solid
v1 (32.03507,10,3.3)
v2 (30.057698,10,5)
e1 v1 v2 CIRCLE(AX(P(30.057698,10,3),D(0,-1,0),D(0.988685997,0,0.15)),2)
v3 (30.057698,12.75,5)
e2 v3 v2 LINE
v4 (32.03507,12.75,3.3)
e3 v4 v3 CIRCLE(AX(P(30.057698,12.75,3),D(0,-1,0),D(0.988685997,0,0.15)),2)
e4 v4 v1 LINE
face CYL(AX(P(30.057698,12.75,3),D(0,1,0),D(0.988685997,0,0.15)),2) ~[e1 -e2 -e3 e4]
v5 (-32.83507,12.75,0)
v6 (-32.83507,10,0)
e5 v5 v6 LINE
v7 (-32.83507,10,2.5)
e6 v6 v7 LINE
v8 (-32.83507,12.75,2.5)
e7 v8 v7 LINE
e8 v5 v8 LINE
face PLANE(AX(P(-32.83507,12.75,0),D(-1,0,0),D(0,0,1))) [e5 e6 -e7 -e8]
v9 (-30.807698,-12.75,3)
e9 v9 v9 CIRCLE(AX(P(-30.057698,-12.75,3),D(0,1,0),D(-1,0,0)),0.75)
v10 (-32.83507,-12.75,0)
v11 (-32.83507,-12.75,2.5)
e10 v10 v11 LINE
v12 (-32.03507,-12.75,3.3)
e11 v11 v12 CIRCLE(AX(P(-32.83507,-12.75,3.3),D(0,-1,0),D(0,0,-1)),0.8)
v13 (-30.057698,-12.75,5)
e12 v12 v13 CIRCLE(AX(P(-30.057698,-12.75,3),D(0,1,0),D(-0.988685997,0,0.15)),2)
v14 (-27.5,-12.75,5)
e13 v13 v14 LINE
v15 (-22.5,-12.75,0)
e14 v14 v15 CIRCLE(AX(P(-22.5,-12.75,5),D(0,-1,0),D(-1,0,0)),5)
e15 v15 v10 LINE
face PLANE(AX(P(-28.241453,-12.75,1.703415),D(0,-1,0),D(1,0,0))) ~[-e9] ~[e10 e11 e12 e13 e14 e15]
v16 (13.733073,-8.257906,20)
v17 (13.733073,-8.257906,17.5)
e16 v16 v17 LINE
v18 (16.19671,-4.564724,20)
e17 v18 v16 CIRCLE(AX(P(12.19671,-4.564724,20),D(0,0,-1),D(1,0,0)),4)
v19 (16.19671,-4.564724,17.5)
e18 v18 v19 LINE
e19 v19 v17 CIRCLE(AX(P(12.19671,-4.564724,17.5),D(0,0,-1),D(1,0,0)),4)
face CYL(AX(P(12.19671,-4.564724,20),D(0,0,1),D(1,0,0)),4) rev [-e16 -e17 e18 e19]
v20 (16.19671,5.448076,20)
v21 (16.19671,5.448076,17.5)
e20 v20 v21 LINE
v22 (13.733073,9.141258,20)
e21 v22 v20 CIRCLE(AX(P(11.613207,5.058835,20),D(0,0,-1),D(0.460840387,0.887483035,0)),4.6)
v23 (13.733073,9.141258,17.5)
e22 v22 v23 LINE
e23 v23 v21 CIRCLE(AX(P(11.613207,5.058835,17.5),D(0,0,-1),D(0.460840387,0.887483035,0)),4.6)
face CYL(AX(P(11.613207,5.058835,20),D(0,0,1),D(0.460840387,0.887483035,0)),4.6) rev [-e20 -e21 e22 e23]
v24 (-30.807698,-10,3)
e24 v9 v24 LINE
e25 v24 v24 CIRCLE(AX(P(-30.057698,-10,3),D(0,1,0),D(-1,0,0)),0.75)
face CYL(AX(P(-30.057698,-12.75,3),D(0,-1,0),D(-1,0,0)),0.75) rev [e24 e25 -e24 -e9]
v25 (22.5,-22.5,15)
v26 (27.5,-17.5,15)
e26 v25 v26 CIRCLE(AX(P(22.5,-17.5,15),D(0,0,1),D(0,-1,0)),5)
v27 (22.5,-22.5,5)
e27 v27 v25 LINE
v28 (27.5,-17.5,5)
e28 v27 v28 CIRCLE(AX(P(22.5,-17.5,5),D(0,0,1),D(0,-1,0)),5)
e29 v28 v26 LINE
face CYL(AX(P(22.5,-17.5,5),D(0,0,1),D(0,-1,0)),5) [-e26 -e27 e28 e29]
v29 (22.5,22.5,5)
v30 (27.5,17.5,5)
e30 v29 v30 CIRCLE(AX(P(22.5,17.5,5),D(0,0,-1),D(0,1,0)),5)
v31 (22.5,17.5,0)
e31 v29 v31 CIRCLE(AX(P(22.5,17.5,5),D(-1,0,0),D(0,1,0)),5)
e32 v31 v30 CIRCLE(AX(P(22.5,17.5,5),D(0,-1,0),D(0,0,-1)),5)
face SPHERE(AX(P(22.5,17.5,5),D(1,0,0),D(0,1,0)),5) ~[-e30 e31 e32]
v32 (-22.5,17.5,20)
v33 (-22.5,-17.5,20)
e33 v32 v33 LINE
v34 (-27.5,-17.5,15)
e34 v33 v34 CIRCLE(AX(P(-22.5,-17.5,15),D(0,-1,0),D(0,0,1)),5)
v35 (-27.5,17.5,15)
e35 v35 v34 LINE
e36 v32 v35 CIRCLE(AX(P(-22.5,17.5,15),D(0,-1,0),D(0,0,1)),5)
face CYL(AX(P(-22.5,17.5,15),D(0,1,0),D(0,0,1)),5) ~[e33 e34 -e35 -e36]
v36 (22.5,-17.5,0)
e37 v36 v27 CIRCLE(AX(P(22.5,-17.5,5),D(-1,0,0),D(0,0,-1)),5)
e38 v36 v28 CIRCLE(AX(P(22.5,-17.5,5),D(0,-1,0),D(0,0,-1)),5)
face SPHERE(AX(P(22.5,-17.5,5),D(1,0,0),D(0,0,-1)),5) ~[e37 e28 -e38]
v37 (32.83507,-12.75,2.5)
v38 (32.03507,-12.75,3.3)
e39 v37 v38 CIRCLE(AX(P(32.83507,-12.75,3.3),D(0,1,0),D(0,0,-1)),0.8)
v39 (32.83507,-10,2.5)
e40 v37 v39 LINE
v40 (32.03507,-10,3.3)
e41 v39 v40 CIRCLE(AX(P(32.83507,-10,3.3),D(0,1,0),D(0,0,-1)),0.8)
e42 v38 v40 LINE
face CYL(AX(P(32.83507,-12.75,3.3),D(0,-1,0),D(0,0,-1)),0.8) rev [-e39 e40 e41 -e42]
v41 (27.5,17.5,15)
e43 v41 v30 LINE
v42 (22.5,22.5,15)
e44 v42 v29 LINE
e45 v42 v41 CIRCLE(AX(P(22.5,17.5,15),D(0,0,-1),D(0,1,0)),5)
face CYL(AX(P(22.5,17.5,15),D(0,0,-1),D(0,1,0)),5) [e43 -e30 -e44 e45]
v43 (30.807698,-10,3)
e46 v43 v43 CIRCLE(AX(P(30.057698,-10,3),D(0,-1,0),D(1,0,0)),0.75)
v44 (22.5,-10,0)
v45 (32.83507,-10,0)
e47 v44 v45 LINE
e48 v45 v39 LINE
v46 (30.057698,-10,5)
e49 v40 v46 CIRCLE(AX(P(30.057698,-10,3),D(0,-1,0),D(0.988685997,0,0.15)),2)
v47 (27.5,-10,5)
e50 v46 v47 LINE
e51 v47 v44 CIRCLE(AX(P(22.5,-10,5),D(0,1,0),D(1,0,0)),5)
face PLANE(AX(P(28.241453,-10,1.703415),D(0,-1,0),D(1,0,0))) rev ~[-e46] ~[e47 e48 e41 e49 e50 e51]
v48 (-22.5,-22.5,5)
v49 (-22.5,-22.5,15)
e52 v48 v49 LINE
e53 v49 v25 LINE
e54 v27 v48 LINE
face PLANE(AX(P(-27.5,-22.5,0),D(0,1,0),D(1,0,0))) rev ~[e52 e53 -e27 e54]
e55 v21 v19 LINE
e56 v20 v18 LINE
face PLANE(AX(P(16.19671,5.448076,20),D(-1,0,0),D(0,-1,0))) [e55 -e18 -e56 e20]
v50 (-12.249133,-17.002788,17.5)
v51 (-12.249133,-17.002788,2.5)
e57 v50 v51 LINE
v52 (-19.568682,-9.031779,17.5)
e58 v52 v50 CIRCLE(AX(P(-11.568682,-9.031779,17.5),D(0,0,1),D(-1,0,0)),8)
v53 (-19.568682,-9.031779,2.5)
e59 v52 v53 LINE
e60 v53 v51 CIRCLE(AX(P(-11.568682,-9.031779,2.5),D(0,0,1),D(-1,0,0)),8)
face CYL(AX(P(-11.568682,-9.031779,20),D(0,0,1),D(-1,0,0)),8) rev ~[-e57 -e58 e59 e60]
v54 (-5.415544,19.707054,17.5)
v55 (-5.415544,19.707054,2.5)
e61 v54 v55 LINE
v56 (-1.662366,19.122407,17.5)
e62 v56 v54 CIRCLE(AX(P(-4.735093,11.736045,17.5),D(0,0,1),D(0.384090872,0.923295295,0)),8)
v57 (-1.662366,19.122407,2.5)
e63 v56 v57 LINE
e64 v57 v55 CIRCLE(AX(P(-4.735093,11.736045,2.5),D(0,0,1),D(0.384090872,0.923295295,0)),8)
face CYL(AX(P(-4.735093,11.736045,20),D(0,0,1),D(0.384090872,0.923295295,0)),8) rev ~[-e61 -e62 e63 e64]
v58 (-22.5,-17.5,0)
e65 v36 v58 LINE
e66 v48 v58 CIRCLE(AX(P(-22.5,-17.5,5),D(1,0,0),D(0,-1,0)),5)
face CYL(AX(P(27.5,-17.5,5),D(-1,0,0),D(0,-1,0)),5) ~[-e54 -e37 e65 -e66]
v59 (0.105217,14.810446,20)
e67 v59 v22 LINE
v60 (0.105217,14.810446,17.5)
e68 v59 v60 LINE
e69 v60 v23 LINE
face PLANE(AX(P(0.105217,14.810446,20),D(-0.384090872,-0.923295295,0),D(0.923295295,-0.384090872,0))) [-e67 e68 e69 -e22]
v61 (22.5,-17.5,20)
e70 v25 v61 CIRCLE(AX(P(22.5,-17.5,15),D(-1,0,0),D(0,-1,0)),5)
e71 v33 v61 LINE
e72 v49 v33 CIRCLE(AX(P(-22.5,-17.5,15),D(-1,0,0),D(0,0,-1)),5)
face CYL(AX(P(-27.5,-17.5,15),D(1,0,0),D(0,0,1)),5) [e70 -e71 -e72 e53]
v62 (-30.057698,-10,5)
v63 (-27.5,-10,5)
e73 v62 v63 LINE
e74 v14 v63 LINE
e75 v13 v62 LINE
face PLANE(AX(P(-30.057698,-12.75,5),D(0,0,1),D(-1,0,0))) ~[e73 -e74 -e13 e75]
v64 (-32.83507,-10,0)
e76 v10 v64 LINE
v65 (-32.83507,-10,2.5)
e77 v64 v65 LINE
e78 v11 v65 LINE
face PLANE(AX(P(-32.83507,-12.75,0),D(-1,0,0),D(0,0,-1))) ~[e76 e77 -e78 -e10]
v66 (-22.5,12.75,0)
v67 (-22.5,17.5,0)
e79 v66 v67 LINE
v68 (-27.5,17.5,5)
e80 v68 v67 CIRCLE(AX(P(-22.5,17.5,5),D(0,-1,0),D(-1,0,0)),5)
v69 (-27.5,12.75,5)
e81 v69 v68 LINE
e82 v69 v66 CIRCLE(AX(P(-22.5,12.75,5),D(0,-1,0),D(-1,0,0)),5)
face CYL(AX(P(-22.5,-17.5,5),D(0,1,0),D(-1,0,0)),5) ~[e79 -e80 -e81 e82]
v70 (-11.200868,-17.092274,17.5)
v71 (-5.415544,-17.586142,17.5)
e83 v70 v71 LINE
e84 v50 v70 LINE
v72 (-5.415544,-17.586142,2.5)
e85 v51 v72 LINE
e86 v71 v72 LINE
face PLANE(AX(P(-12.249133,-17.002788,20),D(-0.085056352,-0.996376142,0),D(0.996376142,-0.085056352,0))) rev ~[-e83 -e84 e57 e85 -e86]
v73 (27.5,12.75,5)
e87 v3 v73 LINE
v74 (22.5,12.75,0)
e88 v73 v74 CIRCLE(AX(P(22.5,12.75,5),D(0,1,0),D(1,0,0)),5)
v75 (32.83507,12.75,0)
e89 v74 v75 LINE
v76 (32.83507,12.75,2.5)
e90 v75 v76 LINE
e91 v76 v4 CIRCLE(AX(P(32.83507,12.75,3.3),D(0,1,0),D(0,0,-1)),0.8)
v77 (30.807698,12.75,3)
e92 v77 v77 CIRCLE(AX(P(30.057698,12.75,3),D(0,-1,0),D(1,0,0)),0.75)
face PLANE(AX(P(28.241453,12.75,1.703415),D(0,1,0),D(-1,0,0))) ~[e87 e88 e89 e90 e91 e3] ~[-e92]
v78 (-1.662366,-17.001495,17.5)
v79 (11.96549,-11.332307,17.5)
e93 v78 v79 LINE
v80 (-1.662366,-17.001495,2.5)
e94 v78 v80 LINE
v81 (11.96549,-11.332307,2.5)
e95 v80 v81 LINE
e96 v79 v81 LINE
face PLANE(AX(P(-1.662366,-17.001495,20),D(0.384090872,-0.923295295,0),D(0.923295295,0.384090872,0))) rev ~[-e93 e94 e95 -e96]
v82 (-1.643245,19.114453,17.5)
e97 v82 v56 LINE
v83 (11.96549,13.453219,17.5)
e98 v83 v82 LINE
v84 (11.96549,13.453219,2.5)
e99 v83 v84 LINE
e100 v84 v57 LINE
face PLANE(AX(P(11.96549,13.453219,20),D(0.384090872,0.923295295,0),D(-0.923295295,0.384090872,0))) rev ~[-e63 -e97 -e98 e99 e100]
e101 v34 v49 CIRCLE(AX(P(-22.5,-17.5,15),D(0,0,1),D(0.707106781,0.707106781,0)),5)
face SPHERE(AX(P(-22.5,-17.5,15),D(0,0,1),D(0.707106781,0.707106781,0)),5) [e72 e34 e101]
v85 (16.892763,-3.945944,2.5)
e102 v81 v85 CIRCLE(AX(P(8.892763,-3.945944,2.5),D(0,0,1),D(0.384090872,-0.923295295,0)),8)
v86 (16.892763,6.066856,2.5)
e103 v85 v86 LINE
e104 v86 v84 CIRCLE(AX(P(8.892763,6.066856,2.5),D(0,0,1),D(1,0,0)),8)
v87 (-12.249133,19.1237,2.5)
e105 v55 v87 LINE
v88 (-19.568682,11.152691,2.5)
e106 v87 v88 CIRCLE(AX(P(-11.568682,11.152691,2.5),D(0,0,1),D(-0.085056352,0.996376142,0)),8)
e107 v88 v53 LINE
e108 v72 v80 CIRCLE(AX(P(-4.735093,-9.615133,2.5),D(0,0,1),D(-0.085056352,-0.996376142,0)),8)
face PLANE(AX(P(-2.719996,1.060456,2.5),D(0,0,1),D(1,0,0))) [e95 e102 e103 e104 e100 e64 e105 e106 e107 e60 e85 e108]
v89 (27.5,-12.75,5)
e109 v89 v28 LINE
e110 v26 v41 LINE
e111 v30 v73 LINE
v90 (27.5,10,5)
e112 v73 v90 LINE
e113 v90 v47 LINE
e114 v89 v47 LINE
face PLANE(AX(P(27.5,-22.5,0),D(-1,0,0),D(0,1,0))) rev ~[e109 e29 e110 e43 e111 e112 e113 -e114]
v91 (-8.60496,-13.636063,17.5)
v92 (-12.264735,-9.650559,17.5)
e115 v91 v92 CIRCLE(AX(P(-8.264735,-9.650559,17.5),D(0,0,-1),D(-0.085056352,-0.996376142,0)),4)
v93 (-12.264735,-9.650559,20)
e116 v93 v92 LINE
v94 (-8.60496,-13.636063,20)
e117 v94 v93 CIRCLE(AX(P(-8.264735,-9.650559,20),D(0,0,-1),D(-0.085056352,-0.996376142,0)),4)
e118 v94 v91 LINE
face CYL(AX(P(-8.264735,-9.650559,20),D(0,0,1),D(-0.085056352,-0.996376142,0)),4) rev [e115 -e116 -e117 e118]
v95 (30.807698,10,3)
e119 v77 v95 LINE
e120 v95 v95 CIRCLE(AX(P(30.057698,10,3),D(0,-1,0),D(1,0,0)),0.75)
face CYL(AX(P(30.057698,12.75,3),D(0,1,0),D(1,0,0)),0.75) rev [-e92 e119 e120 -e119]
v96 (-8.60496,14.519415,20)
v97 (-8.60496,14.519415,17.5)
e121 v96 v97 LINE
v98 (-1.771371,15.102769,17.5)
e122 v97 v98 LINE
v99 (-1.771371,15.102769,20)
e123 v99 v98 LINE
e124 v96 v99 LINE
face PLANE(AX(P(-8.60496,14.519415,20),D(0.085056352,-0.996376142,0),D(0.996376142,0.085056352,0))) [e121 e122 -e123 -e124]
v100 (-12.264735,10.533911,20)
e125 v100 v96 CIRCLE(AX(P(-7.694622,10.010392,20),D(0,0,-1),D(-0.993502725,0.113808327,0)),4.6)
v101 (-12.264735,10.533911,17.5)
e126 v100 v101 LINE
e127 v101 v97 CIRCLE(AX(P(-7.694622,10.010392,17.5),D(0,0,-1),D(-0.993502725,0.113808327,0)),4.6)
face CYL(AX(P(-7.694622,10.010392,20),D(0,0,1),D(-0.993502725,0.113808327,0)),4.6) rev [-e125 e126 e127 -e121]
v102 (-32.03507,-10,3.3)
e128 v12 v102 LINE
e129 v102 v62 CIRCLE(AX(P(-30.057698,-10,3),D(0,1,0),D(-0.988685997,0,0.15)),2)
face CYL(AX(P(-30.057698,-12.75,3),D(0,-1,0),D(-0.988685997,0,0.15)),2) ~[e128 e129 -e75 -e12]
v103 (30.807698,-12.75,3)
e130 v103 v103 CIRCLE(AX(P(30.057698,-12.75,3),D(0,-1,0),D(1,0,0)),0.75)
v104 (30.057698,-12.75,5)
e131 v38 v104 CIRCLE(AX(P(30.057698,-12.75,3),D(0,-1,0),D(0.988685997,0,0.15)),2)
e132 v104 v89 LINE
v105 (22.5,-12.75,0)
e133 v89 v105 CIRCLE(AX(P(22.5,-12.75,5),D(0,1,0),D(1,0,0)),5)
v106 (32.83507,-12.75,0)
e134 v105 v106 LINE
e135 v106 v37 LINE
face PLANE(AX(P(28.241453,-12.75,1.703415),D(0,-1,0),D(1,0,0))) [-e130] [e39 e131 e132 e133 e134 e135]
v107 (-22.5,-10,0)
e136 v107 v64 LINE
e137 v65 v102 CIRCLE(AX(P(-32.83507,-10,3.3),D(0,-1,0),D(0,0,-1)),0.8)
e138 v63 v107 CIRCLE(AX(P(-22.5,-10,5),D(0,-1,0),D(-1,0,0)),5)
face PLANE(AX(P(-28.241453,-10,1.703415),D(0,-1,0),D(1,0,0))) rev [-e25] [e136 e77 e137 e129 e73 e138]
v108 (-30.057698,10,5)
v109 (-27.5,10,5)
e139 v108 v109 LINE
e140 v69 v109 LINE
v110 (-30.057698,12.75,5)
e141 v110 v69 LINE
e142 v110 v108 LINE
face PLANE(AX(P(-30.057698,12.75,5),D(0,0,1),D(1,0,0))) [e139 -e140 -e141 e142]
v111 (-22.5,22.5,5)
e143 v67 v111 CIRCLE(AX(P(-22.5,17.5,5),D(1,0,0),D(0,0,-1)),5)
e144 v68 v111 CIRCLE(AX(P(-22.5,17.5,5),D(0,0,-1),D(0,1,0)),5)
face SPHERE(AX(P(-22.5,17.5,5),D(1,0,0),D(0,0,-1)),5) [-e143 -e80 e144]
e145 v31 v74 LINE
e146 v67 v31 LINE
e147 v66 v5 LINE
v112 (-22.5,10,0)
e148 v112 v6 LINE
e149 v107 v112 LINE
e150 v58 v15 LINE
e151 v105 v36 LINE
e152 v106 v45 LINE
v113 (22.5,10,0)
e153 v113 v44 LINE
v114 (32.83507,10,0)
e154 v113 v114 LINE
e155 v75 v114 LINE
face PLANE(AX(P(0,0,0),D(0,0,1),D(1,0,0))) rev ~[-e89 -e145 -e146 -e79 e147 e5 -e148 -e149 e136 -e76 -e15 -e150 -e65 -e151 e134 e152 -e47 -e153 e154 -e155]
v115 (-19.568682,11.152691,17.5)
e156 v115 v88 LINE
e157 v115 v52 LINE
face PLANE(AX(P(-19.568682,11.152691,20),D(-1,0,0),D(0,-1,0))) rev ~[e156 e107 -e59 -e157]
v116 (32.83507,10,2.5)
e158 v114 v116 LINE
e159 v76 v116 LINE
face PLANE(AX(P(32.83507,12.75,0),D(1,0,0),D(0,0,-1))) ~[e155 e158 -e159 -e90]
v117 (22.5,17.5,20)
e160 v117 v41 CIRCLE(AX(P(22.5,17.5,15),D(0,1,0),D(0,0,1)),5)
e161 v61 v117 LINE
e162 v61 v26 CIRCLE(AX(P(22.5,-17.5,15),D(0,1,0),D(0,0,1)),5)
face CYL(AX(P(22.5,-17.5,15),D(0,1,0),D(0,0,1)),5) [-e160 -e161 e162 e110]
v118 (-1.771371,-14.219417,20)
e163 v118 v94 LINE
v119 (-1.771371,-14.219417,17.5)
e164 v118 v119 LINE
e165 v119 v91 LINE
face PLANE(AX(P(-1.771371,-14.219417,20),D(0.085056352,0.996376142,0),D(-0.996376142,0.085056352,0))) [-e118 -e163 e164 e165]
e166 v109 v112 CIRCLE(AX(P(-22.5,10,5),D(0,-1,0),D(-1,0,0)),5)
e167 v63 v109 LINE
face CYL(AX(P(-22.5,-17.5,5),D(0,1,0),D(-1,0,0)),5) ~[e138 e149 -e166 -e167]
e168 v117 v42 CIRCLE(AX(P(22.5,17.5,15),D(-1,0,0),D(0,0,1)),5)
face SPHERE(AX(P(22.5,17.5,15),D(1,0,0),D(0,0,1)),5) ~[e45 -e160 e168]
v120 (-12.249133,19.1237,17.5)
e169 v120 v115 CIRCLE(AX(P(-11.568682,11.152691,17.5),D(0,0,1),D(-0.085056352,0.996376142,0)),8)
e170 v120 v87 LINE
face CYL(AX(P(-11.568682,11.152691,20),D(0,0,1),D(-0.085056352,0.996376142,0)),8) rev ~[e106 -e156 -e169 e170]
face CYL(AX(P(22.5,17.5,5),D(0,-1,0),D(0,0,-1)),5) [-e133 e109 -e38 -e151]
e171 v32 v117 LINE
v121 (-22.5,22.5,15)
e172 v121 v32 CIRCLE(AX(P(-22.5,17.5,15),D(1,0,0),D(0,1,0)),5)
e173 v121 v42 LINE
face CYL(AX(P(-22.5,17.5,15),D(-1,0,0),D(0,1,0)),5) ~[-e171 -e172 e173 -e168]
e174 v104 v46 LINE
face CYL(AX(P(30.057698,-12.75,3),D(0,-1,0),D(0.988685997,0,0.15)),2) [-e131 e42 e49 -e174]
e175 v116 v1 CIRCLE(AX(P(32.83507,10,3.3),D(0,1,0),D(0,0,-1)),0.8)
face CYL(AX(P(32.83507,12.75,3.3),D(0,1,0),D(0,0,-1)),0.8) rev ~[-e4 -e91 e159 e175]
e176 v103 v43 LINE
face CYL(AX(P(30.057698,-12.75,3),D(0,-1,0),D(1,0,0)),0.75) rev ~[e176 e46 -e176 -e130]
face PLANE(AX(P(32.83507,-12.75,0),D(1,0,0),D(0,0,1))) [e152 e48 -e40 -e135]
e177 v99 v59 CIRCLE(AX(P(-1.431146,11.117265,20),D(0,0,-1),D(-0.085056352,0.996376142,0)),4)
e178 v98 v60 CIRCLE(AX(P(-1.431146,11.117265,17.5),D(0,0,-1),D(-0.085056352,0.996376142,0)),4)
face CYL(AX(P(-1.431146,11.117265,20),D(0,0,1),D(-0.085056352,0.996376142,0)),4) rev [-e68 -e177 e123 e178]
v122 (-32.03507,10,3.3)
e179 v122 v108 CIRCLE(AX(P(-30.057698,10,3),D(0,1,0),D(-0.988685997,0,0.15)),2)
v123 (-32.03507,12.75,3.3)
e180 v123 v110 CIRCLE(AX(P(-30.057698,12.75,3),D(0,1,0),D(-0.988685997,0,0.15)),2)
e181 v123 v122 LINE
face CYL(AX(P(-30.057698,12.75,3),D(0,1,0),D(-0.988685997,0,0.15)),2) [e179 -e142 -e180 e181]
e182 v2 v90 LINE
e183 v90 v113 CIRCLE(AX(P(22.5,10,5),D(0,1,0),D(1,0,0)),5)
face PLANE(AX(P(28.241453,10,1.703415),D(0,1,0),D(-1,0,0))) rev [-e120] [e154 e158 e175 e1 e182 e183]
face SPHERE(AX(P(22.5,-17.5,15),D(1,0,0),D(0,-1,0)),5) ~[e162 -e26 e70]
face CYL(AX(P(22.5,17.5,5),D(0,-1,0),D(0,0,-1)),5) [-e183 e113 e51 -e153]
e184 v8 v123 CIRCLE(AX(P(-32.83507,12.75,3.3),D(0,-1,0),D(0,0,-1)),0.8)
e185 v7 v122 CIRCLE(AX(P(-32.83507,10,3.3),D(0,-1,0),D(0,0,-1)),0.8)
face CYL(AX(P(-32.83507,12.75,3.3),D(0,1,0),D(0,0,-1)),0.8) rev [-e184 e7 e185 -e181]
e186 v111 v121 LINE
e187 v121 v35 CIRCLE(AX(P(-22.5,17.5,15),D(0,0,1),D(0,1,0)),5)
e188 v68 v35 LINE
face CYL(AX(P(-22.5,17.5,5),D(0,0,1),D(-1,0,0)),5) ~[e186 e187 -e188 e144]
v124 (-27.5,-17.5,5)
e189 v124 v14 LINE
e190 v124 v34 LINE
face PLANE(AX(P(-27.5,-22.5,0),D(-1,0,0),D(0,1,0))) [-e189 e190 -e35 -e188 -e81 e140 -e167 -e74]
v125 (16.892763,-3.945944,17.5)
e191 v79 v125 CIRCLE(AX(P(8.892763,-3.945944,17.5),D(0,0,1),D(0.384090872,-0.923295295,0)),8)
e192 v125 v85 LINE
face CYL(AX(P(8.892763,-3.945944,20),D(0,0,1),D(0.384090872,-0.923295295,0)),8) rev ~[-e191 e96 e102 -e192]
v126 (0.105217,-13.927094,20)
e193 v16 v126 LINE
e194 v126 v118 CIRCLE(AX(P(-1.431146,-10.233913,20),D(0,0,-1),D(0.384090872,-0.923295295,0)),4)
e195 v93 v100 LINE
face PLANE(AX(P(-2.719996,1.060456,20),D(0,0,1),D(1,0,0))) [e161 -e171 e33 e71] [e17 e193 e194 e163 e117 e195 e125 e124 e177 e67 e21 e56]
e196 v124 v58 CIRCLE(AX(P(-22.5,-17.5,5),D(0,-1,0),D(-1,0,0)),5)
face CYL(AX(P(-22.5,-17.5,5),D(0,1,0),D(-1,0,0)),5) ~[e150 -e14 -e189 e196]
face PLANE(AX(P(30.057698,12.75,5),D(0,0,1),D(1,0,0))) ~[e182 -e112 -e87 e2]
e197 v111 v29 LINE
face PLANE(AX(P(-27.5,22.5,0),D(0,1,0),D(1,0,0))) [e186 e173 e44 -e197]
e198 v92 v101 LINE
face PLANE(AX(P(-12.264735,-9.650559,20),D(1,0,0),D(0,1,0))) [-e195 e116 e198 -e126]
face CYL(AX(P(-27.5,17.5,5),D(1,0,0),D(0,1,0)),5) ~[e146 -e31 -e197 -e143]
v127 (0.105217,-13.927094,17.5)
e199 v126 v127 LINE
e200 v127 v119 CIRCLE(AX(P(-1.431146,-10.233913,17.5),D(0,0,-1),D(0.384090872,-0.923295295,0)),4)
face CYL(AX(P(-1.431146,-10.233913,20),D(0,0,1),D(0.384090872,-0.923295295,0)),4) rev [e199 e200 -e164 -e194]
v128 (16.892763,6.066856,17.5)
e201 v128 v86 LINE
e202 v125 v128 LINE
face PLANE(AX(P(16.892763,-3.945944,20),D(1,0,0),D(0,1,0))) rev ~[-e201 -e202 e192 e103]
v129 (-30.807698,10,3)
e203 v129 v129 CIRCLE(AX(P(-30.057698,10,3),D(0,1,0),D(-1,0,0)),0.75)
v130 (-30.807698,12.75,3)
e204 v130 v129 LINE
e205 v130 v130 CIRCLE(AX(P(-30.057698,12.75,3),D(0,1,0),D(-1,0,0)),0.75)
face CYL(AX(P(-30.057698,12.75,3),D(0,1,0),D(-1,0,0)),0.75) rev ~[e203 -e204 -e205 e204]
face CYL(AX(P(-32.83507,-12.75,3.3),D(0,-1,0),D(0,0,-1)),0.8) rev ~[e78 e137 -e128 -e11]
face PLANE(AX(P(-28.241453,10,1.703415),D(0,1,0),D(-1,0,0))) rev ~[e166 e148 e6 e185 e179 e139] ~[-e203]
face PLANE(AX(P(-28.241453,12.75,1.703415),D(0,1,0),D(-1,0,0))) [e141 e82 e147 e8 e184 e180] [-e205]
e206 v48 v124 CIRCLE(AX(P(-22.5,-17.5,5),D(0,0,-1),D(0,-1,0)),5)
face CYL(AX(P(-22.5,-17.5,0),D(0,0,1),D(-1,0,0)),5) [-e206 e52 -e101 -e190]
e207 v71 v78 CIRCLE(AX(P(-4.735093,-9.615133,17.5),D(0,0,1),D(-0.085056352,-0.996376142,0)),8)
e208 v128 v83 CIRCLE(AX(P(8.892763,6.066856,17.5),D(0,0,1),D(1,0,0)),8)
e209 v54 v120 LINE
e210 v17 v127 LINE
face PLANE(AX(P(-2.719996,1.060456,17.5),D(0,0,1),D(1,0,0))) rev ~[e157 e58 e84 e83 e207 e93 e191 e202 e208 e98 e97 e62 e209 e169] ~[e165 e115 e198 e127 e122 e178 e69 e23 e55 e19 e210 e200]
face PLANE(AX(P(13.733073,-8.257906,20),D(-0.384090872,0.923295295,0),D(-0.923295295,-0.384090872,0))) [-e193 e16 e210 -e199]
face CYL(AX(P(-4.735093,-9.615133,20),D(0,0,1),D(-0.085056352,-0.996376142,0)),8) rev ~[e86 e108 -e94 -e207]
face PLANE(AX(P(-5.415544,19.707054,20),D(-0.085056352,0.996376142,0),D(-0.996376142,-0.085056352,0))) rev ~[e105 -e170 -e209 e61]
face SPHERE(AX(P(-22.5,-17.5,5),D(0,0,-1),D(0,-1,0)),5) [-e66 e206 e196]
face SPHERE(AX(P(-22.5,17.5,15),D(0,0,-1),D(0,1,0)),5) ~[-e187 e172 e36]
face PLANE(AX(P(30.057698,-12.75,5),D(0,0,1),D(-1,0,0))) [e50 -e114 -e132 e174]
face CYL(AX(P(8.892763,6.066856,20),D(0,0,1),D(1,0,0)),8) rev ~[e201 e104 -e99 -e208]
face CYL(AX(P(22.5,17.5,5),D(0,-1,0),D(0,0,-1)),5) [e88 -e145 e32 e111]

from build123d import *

# Parameters (mm, degrees)
F0_W              = 55
F0_H              = 45
F1_DEPTH          = 20
F5_DEPTH          = 17.5
F7_DEPTH          = 2.5
F9_R              = 5
F10_F1_R          = 5
F10_F2_R          = 5
F11_T1_DEPTH      = 35
F11_T3_DEPTH      = 62.5
F11_S7_W          = 5
F11_S7_H          = 5
F11_T8_DEPTH      = 5
F11_T12_ANGLE     = 90
F12_R             = 5
F15_R             = 0.75
F16_DEPTH         = 2.75
F16_COPIES2_COUNT = 2


# Not quite as in the source:
# - a fillet or chamfer that OpenCascade refuses, or shapes differently, is made with other operations: its cross-section is extruded or revolved along the edge and cut away or added
# - a feature of the source that left no trace in its solid (it failed there, or was rolled back) is left out
# - a pattern or mirror of a feature is missing from the dataset's text; its kind, count and spacing are read off the source's solid


with BuildPart() as f1:
    # F0 (on Top) → F1 (new body)
    with BuildSketch(Plane.XY):
        Rectangle(F0_W, F0_H)
    extrude(amount=F1_DEPTH)

    # F4 (on face) → F5 (cut)
    with BuildSketch(Plane.XY.offset(20)):
        with BuildLine():
            Line((-19.5686819828, 11.1526907945), (-19.5686819828, 1.0604560375))
            Line((-19.5686819828, 1.0604560375), (-19.5686819828, -9.0317787194))
            ThreePointArc((-19.5686819828, -9.0317787194), (-17.4612029419, -14.4427117948), (-12.2491327961, -17.0027878582))
            Line((-12.2491327961, -17.0027878582), (-5.4155437946, -17.5861419999))
            ThreePointArc((-5.4155437946, -17.5861419999), (-3.5037525417, -17.5198024128), (-1.6623660017, -17.0014952208))
            Line((-1.6623660017, -17.0014952208), (11.9654898342, -11.3323067543))
            ThreePointArc((11.9654898342, -11.3323067543), (15.5479043196, -8.3854367171), (16.8927628547, -3.9459443945))
            Line((16.8927628547, -3.9459443945), (16.8927628547, 1.0604560375))
            Line((16.8927628547, 1.0604560375), (16.8927628547, 6.0668564696))
            ThreePointArc((16.8927628547, 6.0668564696), (15.5479043196, 10.5063487921), (11.9654898342, 13.4532188293))
            Line((11.9654898342, 13.4532188293), (-1.6623660017, 19.1224072959))
            ThreePointArc((-1.6623660017, 19.1224072959), (-3.5037525417, 19.6407144879), (-5.4155437946, 19.7070540749))
            Line((-5.4155437946, 19.7070540749), (-12.2491327961, 19.1236999333))
            ThreePointArc((-12.2491327961, 19.1236999333), (-17.4612029419, 16.5636238699), (-19.5686819828, 11.1526907945))
        make_face()
    extrude(amount=-F5_DEPTH, mode=Mode.SUBTRACT)

    # F6 (on face) → F7 (join)
    with BuildSketch(Plane.XY.offset(20)):
        with BuildLine():
            ThreePointArc((-12.2491327961, 19.1236999333), (-17.4612029419, 16.5636238699), (-19.5686819828, 11.1526907945))
            Line((-19.5686819828, 11.1526907945), (-19.5686819828, -9.0317787194))
            ThreePointArc((-19.5686819828, -9.0317787194), (-17.4612029419, -14.4427117948), (-12.2491327961, -17.0027878582))
            Line((-12.2491327961, -17.0027878582), (-11.2008683554, -17.0922736911))
            Line((-11.2008683554, -17.0922736911), (-5.4155437946, -17.5861419999))
            ThreePointArc((-5.4155437946, -17.5861419999), (-3.5037525417, -17.5198024128), (-1.6623660017, -17.0014952208))
            Line((-1.6623660017, -17.0014952208), (11.9654898342, -11.3323067543))
            ThreePointArc((11.9654898342, -11.3323067543), (15.5479043196, -8.3854367171), (16.8927628547, -3.9459443945))
            Line((16.8927628547, -3.9459443945), (16.8927628547, 6.0668564696))
            ThreePointArc((16.8927628547, 6.0668564696), (15.5479043196, 10.5063487921), (11.9654898342, 13.4532188293))
            Line((11.9654898342, 13.4532188293), (-1.6432446132, 19.1144527977))
            Line((-1.6432446132, 19.1144527977), (-1.6623660017, 19.1224072959))
            ThreePointArc((-1.6623660017, 19.1224072959), (-3.5037525417, 19.6407144879), (-5.4155437946, 19.7070540749))
            Line((-5.4155437946, 19.7070540749), (-12.2491327961, 19.1236999333))
        make_face()
        with BuildLine():
            Line((-12.2647350556, -9.6505587512), (-12.2647350556, 0.4416760057))
            Line((-12.2647350556, 0.4416760057), (-12.2647350556, 10.5339107627))
            ThreePointArc((-12.2647350556, 10.5339107627), (-11.0828219735, 13.1216791931), (-8.6049604623, 14.5194153321))
            Line((-8.6049604623, 14.5194153321), (-1.7713714607, 15.1027694737))
            ThreePointArc((-1.7713714607, 15.1027694737), (-0.8154758343, 15.0695996802), (0.1052174357, 14.8104460842))
            Line((0.1052174357, 14.8104460842), (13.7330732716, 9.1412576176))
            ThreePointArc((13.7330732716, 9.1412576176), (15.4399139751, 7.6115436145), (16.1967097819, 5.4480764378))
            Line((16.1967097819, 5.4480764378), (16.1967097819, 0.4416760057))
            Line((16.1967097819, 0.4416760057), (16.1967097819, -4.5647244263))
            ThreePointArc((16.1967097819, -4.5647244263), (15.5242805143, -6.7844705876), (13.7330732716, -8.2579056062))
            Line((13.7330732716, -8.2579056062), (0.1052174357, -13.9270940728))
            ThreePointArc((0.1052174357, -13.9270940728), (-0.8154758343, -14.1862476688), (-1.7713714607, -14.2194174623))
            Line((-1.7713714607, -14.2194174623), (-8.6049604623, -13.6360633206))
            ThreePointArc((-8.6049604623, -13.6360633206), (-11.2109955351, -12.3560252889), (-12.2647350556, -9.6505587512))
        make_face(mode=Mode.SUBTRACT)
    extrude(amount=-F7_DEPTH)

    # F9
    f9_edges = [f1.edges().sort_by_distance(p)[0] for p in [
        (-27.5, -22.5, 10),
        (0, -22.5, 20),
    ]]
    fillet(f9_edges, radius=F9_R)

    # F10: fillet of radius 5 on 2 edges, made by hand

    # F10_f1
    f10_f1_edges = [f1.edges().sort_by_distance(p)[0] for p in [
        (0, 22.5, 0),
    ]]
    fillet(f10_f1_edges, radius=F10_F1_R)

    # F10_f2
    f10_f2_edges = [f1.edges().sort_by_distance(p)[0] for p in [
        (-27.5, 22.5, 12.5),
    ]]
    fillet(f10_f2_edges, radius=F10_F2_R)

    # F11: fillet of radius 5 on 2 edges, made by hand

    # F11_s2 → F11_t1 (cut)
    with BuildSketch(Plane.XZ.offset(-17.5)):
        with BuildLine():
            ThreePointArc((-22.5, 20), (-26.0355339059, 18.5355339059), (-27.5, 15))
            Line((-27.5, 15), (-27.5, 20))
            Line((-27.5, 20), (-22.5, 20))
        make_face()
    extrude(amount=F11_T1_DEPTH, mode=Mode.SUBTRACT)

    # F11_s4 → F11_t3 (cut)
    with BuildSketch(Plane.YZ.offset(-22.5)):
        with BuildLine():
            ThreePointArc((22.5, 15), (21.0355339059, 18.5355339059), (17.5, 20))
            Line((17.5, 20), (22.5, 20))
            Line((22.5, 20), (22.5, 15))
        make_face()
    extrude(amount=F11_T3_DEPTH, mode=Mode.SUBTRACT)


with BuildPart() as f11_tool6:
    # F11_s7 → F11_t8 (new body)
    with BuildSketch(Plane.XY.offset(15)):
        with Locations((-25, -20)):
            Rectangle(F11_S7_W, F11_S7_H)
    extrude(amount=F11_T8_DEPTH)

    # F11_s9 → F11_t10 (revolve, cut)
    with BuildSketch(Plane(origin=(-22.5, -17.5, 15), x_dir=(0.7071067812, 0.7071067812, 0), z_dir=(0.7071067812, -0.7071067812, 0))):
        with BuildLine():
            ThreePointArc((0, -5), (5, 0), (0, 5))
            Line((0, 5), (0, -5))
        make_face()
    revolve(axis=Axis((-22.5, -17.5, 15), (0, 0, 1)), mode=Mode.SUBTRACT)


with BuildPart() as f1_1:
    add(f1.part)

    # F11_t5: cut F11_tool6
    add(f11_tool6.part, mode=Mode.SUBTRACT)

    # F11_s11 → F11_t12 (revolve, cut)
    with BuildSketch(Plane.YZ.offset(-22.5)):
        with BuildLine():
            ThreePointArc((17.5, 20), (21.0355339059, 18.5355339059), (22.5, 15))
            Line((22.5, 15), (22.5, 20))
            Line((22.5, 20), (17.5, 20))
        make_face()
    revolve(axis=Axis((-22.5, 17.5, 20), (0, 0, 1)), revolution_arc=F11_T12_ANGLE, mode=Mode.SUBTRACT)

    # F12
    f12_edges = [f1_1.edges().sort_by_distance(p)[0] for p in [
        (-22.5, -22.5, 10),
        (27.5, 21.035534, 1.464466),
        (27.5, 22.5, 10),
        (27.5, 21.035534, 18.535534),
        (27.5, 0, 20),
        (27.5, -21.035534, 18.535534),
        (27.5, -22.5, 10),
        (27.5, -21.035534, 1.464466),
    ]]
    fillet(f12_edges, radius=F12_R)

    # F15 (on offset) → F16 (join)
    with BuildSketch(Plane.XZ.offset(12.75)):
        with BuildLine():
            Line((30.0576982113, 5), (27.5, 5))
            ThreePointArc((27.5, 5), (26.0355339059, 1.4644660941), (22.5, 0))
            Line((22.5, 0), (32.8350702046, 0))
            Line((32.8350702046, 0), (32.8350702046, 2.5))
            ThreePointArc((32.8350702046, 2.5), (32.2693847797, 2.7343145751), (32.0350702046, 3.3))
            ThreePointArc((32.0350702046, 3.3), (31.3615386923, 4.5165750888), (30.0576982113, 5))
        make_face()
        with Locations((30.0576982113, 3)):
            Circle(F15_R, mode=Mode.SUBTRACT)
    f16 = extrude(amount=-F16_DEPTH)

    # F16_copies: F16 across plane
    add(f16.mirror(Plane(origin=(0, 0, 0), x_dir=(0, 0, -1), z_dir=(-1, 0, 0))))

    # F16_copies1: F16 across plane
    add(f16.mirror(Plane.ZX))

    # F16_copies2: F16 ×2 about axis
    f16_copies2_axis = Axis((0, 0, 0), (0, 0, 1))
    for i in range(1, F16_COPIES2_COUNT):
        add(f16.rotate(f16_copies2_axis, i * 360 / F16_COPIES2_COUNT))


solid = f1_1.part
